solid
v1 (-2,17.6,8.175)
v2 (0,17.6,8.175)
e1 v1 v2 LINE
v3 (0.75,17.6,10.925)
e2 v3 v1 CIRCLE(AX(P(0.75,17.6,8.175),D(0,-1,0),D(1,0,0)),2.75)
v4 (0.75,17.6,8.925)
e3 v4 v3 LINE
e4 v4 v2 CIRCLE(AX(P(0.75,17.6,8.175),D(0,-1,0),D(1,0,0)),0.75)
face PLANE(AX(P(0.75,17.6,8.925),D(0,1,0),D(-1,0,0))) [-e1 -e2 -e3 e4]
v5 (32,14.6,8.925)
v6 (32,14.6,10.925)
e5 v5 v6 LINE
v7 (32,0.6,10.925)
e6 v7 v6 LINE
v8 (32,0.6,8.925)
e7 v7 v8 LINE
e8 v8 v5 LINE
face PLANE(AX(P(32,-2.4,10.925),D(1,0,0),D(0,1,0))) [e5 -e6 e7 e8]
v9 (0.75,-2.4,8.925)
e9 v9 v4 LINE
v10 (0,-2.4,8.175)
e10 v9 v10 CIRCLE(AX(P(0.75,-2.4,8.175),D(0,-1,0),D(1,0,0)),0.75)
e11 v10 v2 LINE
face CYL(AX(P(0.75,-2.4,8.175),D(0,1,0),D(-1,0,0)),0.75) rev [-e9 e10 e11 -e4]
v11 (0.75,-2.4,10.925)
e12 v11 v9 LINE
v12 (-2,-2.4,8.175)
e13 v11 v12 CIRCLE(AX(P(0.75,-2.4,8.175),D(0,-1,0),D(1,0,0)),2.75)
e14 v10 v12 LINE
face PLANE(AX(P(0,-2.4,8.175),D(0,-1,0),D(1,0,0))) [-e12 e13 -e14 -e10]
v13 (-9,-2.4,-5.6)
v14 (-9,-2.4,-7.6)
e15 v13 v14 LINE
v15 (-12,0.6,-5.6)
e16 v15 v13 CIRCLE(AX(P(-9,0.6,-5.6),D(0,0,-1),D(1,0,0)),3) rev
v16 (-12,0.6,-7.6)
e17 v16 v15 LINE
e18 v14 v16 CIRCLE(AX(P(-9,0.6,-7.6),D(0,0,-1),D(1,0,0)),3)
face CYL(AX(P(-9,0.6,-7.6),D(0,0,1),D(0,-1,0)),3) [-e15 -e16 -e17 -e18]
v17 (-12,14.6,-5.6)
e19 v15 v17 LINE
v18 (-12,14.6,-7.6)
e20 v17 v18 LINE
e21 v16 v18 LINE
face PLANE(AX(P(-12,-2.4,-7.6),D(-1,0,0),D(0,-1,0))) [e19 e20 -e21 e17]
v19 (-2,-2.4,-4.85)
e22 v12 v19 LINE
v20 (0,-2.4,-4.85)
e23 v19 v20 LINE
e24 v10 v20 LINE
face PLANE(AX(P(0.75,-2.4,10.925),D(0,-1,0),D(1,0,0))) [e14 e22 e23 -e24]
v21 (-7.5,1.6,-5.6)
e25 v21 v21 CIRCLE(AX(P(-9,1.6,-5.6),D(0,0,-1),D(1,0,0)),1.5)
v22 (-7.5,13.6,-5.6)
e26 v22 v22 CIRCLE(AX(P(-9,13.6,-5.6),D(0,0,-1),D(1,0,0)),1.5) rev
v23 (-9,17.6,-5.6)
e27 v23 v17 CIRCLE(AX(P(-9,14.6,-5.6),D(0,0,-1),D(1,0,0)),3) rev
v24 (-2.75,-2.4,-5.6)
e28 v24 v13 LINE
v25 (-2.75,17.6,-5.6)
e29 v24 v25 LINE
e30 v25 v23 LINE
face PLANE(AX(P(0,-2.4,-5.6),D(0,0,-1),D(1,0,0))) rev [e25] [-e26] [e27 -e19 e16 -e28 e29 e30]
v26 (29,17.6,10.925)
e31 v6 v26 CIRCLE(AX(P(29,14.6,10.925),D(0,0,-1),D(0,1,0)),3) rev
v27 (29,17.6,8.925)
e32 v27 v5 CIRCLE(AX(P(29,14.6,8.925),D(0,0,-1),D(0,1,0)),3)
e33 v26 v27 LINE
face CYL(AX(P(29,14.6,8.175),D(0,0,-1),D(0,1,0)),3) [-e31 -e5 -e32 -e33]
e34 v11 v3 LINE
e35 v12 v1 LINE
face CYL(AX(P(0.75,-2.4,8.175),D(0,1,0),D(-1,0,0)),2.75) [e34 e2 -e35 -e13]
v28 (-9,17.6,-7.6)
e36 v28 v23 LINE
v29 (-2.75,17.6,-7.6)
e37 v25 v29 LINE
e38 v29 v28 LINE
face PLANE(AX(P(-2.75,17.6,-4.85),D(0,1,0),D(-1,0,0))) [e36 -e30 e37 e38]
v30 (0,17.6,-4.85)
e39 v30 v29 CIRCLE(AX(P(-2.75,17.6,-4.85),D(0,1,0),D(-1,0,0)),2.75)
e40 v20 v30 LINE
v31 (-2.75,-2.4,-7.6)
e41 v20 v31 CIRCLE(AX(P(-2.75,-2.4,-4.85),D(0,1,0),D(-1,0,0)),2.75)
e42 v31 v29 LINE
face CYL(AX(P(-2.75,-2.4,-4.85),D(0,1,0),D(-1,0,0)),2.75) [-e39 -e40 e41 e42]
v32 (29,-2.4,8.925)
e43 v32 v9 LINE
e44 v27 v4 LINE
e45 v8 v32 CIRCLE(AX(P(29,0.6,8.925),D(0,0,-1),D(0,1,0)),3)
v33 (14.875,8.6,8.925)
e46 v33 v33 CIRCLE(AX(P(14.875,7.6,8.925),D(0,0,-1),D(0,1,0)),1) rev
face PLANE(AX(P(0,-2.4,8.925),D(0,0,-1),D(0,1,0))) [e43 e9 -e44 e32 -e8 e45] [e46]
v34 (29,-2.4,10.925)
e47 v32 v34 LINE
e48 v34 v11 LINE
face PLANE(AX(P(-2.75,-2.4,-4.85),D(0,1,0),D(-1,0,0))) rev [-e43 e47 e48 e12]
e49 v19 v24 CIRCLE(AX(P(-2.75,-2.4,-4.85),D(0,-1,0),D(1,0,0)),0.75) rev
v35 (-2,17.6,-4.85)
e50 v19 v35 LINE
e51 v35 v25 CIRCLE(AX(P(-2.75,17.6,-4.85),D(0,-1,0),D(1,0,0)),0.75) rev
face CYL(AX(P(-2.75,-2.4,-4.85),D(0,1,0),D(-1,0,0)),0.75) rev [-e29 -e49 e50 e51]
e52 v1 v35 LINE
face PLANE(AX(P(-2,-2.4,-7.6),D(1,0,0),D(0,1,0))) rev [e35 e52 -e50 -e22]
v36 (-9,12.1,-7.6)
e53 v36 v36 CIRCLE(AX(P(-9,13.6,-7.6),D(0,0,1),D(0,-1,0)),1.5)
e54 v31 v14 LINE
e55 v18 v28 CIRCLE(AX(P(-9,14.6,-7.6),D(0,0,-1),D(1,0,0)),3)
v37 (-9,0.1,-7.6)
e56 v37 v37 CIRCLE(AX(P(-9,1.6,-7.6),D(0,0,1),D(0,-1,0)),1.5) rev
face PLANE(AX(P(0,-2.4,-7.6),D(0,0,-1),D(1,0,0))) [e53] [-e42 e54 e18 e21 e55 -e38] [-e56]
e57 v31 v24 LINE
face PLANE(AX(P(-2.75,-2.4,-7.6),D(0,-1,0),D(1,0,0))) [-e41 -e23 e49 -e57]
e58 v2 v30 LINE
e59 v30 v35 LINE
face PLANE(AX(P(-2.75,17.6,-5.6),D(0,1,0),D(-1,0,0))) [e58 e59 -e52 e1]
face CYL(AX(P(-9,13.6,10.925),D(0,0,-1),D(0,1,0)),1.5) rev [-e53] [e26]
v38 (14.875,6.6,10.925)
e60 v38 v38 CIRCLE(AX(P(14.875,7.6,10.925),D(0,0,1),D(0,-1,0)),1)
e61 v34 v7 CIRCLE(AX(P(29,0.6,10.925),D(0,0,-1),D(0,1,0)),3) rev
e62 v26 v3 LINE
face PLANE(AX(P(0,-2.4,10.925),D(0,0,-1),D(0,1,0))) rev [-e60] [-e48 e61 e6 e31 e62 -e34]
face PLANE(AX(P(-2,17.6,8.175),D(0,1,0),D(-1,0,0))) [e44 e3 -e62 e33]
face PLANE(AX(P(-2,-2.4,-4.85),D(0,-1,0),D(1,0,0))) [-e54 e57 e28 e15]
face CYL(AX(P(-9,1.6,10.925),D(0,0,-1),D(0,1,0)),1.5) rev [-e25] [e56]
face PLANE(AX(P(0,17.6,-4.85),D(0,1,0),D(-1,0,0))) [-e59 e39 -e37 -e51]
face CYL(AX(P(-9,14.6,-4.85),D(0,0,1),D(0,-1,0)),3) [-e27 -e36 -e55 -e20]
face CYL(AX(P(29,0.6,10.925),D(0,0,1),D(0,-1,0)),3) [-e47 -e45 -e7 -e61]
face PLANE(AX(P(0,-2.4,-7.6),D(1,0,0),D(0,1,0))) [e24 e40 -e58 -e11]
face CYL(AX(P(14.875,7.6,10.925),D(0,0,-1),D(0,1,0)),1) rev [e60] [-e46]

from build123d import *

# Parameters (mm, degrees)
BASE_FLANGE1_DEPTH    = 10
FILLET1_R             = 3
SKETCH7_R             = 1.5
SKETCH7_R_2           = 1
CUT_EXTRUDE1_DEPTH    = 39.303728604
BODY_MOVE_COPY1_ANGLE = 90


# Sheet-metal steps are written as plain solids
with BuildPart() as part:
    # Sketch1 → Base-Flange1 (new, symmetric)
    with BuildSketch(Plane.XY):
        with BuildLine():
            Line((-12, 0), (-2.75, 0))
            ThreePointArc((-2.75, 0), (-0.805456352, 0.805456352), (0, 2.75))
            Line((0, 2.75), (0, 15.775))
            ThreePointArc((0, 15.775), (0.219669914, 16.305330086), (0.75, 16.525))
            Line((0.75, 16.525), (32, 16.525))
            Line((32, 16.525), (32, 18.525))
            Line((32, 18.525), (0.75, 18.525))
            ThreePointArc((0.75, 18.525), (-1.194543648, 17.719543648), (-2, 15.775))
            Line((-2, 15.775), (-2, 2.75))
            ThreePointArc((-2, 2.75), (-2.219669914, 2.219669914), (-2.75, 2))
            Line((-2.75, 2), (-12, 2))
            Line((-12, 2), (-12, 0))
        make_face()
    extrude(amount=BASE_FLANGE1_DEPTH, both=True)

    # Fillet1
    fillet1_edges = [part.edges().sort_by_distance(p)[0] for p in [
        (32, 17.525, -10),
        (-12, 1, -10),
        (32, 17.525, 10),
        (-12, 1, 10),
    ]]
    fillet(fillet1_edges, radius=FILLET1_R)

    # Sketch7 → Cut-Extrude1 (cut, through all)
    with BuildSketch(Plane(origin=(0, 0, 0), x_dir=(1, 0, 0), z_dir=(0, 1, 0))):
        with Locations((-9, 6)):
            Circle(SKETCH7_R)
        with Locations((-9, -6)):
            Circle(SKETCH7_R)
        with Locations(Location((14.875, 0, 0), (0, 0, 90))):
            Circle(SKETCH7_R_2)
    extrude(amount=CUT_EXTRUDE1_DEPTH, mode=Mode.SUBTRACT)


with BuildPart() as part_1:
    # Body-Move/Copy1: moved
    add(part.part.rotate(Axis((0, 7.6, 0), (1, 0, 0)), BODY_MOVE_COPY1_ANGLE))


solid = part_1.part
